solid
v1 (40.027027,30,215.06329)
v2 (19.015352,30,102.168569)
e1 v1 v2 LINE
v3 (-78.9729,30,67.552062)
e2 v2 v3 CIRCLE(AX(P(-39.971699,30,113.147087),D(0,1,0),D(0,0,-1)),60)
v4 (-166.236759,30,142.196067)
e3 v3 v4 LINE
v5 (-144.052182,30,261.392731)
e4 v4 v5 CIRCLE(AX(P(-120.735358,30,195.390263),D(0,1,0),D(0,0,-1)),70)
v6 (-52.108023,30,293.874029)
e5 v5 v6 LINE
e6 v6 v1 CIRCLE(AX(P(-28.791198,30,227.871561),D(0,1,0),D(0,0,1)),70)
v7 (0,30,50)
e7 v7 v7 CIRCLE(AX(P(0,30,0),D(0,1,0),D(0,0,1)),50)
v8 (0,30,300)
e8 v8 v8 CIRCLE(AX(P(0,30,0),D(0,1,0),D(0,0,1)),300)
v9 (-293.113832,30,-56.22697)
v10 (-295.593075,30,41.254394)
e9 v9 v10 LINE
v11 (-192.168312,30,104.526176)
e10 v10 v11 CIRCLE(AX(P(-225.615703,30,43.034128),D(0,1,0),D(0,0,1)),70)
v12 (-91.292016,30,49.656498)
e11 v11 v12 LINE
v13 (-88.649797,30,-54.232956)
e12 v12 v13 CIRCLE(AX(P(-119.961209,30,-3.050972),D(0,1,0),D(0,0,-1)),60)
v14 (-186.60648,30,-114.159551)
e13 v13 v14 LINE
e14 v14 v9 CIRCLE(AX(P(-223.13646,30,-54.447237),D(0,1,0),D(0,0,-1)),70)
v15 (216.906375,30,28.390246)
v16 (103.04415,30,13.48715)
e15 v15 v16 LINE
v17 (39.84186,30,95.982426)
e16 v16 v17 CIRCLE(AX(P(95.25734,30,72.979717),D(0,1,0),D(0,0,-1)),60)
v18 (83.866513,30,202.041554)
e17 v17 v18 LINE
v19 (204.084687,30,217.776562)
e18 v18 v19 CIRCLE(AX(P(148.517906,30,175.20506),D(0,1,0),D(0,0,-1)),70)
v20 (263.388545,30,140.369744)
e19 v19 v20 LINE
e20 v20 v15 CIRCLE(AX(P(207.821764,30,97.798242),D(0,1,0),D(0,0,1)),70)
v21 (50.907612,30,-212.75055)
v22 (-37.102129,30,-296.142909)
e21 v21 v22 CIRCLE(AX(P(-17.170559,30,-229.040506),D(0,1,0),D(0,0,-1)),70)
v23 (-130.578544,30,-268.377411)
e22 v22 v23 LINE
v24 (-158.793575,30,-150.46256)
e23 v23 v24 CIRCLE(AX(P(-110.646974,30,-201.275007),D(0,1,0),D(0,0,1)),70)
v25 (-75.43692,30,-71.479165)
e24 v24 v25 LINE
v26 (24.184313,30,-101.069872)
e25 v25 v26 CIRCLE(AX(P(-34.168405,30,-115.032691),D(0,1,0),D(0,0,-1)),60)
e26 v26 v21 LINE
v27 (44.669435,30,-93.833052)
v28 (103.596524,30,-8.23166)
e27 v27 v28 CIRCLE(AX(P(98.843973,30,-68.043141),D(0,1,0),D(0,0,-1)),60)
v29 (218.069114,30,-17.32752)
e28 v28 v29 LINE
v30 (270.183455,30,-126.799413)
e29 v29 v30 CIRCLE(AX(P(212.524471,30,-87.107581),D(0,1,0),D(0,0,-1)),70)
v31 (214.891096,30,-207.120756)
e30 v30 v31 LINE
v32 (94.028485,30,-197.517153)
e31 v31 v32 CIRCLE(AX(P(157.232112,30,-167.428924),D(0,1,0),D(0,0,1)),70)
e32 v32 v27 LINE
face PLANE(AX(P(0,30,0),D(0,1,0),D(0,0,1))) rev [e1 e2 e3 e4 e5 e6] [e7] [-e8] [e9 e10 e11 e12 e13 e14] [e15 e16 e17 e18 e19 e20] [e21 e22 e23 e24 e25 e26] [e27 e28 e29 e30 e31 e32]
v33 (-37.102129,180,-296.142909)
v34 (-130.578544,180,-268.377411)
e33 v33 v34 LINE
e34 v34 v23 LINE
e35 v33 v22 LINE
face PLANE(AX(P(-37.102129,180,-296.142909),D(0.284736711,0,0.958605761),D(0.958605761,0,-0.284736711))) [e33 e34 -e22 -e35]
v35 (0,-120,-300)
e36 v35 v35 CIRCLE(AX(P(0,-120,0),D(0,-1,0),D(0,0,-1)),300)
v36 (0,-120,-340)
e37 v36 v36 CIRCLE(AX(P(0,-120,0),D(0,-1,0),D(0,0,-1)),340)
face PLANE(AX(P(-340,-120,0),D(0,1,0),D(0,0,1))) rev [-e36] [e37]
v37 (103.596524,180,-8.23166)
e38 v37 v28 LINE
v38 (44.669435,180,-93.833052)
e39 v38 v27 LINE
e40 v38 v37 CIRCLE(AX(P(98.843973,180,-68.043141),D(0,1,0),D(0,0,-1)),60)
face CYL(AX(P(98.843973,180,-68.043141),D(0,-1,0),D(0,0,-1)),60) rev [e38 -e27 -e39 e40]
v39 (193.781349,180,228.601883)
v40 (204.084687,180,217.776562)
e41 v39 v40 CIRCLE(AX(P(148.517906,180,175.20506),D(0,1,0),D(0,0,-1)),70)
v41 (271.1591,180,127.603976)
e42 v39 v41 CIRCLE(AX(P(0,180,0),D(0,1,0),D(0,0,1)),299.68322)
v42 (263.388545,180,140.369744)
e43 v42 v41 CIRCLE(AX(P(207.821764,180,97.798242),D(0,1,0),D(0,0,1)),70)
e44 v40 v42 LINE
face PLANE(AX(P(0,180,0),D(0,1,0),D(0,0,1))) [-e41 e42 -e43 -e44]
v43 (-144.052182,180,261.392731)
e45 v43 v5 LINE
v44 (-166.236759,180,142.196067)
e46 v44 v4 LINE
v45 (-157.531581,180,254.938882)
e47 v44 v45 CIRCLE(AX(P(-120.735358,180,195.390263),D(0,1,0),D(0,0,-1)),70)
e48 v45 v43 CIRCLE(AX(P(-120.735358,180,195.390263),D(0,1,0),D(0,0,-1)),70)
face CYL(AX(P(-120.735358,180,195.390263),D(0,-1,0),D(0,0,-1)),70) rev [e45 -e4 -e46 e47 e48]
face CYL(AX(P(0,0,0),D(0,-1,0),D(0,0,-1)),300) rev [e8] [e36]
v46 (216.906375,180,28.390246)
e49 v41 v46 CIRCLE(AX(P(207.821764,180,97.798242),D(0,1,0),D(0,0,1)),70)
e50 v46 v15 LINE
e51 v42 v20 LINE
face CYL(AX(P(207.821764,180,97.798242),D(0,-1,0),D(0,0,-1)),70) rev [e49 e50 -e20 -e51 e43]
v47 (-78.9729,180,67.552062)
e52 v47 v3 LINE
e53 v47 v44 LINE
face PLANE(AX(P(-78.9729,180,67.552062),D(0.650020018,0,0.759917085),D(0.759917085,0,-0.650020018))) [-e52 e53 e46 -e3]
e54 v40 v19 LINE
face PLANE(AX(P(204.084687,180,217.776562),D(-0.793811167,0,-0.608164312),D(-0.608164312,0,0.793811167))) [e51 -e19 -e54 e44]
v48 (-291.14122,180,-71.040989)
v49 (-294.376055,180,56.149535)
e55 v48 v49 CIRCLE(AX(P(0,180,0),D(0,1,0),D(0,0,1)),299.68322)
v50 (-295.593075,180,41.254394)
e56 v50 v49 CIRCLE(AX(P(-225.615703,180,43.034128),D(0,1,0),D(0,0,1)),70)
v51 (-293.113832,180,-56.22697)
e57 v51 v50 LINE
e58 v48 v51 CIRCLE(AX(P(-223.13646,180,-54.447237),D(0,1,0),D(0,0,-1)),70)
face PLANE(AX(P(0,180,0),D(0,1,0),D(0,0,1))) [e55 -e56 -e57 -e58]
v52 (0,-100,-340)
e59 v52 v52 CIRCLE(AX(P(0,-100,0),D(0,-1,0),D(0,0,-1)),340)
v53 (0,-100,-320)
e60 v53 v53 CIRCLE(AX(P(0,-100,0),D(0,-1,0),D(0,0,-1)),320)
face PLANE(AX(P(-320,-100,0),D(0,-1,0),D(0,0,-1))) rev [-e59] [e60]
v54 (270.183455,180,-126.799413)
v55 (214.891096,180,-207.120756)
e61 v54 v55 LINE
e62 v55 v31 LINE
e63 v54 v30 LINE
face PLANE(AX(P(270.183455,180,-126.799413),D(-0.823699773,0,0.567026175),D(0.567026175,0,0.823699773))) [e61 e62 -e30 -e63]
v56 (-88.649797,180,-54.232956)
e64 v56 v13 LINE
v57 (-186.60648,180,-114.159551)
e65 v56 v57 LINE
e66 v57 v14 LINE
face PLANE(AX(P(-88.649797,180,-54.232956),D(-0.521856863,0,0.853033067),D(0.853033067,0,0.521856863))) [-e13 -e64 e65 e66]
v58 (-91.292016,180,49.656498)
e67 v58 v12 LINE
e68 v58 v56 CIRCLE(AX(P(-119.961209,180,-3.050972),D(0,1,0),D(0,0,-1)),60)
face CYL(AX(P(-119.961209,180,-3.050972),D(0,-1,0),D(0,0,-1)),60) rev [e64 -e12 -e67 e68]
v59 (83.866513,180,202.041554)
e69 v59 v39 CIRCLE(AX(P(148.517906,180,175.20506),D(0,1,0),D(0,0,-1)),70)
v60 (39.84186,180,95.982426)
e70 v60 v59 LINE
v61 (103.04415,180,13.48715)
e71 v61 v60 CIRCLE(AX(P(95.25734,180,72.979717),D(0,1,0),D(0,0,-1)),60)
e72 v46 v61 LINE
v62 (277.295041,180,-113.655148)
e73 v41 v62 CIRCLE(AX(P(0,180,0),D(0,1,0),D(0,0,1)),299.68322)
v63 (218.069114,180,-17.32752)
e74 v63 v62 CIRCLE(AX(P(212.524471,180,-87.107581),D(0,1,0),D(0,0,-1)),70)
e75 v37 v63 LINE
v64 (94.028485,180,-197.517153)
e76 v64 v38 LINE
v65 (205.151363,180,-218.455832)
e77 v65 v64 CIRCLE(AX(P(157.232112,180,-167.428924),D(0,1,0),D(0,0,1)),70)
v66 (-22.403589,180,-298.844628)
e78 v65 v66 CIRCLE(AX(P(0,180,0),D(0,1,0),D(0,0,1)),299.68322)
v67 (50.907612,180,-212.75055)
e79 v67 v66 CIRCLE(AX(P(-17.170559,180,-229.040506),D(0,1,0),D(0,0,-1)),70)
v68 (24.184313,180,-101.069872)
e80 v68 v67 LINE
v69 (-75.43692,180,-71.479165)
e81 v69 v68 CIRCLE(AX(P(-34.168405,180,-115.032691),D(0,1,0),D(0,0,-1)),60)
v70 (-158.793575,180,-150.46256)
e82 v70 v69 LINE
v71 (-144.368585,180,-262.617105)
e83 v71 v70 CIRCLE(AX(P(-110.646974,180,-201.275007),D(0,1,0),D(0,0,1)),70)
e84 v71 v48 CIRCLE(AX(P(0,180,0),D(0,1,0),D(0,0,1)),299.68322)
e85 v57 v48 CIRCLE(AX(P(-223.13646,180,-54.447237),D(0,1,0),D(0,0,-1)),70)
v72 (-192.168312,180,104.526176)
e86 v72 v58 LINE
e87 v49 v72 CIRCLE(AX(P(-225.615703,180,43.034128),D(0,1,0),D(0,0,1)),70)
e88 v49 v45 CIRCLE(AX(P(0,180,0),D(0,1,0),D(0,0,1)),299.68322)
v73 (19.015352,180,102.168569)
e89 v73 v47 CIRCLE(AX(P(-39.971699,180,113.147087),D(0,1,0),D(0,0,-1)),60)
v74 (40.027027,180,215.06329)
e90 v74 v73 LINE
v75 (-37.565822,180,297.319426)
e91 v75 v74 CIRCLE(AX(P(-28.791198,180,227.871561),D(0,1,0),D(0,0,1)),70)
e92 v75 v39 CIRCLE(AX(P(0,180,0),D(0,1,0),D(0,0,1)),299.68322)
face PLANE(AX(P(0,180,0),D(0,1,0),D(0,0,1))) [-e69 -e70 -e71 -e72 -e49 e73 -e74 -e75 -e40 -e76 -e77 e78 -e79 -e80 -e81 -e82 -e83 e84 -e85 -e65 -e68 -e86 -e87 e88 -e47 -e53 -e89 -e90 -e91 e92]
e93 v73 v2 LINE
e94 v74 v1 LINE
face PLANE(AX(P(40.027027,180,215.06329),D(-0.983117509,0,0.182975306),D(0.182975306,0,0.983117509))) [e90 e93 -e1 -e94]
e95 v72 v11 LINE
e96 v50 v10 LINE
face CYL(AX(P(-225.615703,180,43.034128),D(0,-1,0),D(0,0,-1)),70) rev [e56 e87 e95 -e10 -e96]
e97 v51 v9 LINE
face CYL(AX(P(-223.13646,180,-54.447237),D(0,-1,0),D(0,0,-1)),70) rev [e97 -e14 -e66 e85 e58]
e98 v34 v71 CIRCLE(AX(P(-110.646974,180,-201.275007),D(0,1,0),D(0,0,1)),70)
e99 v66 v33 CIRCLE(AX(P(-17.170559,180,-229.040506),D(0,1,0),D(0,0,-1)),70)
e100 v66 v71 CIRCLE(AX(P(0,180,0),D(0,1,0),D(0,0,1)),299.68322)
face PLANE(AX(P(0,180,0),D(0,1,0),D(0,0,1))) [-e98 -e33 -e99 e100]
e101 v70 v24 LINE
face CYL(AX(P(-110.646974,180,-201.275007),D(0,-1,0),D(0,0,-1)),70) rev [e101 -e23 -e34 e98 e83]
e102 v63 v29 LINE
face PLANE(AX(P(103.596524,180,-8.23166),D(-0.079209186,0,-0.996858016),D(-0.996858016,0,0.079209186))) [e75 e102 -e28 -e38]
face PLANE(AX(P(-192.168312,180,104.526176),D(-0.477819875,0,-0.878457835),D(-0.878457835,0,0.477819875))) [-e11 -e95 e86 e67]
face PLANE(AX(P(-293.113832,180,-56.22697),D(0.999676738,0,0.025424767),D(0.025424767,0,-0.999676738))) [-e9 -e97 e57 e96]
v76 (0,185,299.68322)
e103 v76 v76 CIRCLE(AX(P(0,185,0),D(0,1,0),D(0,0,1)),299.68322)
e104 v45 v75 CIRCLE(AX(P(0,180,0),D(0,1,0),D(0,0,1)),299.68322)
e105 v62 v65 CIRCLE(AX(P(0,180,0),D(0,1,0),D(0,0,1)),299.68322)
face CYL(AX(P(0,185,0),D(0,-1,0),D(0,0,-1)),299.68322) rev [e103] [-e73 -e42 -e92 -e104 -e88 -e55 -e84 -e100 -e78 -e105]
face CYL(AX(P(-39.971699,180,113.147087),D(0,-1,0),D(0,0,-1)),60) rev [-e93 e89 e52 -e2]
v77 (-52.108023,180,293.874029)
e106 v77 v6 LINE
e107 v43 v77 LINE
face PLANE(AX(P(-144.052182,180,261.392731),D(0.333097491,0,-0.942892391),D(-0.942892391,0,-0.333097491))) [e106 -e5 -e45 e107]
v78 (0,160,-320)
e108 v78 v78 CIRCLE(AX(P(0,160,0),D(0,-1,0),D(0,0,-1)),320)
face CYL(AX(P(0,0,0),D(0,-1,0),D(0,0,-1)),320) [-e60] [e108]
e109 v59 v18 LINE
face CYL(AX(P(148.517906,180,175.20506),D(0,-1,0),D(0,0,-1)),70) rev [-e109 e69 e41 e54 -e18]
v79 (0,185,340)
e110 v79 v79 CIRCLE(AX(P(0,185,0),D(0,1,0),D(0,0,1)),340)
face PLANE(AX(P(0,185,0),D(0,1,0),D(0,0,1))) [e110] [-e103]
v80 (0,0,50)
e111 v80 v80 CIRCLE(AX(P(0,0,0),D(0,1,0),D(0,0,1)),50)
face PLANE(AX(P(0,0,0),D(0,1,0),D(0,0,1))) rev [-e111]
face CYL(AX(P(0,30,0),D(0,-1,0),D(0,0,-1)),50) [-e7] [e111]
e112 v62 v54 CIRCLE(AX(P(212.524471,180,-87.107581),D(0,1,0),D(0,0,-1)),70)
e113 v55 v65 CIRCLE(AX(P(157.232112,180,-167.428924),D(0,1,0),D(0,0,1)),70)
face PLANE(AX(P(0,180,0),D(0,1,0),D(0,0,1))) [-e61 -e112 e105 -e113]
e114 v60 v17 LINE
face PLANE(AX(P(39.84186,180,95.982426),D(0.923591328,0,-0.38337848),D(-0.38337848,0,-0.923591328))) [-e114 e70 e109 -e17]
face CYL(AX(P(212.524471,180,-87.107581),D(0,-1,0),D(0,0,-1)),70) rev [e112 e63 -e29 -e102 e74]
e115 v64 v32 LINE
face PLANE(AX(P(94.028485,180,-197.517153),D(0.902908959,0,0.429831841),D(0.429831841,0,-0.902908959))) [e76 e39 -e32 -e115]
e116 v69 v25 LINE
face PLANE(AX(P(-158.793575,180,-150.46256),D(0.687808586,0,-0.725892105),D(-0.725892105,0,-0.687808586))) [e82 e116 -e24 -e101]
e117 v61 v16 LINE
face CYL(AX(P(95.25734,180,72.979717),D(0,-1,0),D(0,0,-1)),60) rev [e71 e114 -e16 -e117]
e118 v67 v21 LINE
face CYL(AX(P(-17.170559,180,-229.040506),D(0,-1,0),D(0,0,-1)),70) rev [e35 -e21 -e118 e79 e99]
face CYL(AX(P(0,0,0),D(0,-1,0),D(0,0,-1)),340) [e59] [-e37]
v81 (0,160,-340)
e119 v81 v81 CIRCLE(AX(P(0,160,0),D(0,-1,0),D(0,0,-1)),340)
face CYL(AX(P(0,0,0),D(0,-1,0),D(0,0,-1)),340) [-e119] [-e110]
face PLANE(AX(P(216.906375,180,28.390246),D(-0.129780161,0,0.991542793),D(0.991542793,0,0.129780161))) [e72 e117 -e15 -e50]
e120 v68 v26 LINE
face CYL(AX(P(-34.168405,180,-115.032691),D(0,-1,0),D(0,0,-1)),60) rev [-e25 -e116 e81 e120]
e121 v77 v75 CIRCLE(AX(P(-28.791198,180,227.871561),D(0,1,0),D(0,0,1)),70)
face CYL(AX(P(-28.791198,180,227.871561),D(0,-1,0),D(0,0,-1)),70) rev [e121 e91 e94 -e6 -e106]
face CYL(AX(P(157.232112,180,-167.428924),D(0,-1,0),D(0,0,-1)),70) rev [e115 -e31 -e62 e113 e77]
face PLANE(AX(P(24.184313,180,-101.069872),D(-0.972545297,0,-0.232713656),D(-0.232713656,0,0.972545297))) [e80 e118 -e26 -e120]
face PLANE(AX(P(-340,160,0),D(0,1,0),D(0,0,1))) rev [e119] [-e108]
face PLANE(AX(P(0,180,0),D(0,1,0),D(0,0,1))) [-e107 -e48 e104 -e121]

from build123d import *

# Parameters (mm, degrees)
SKETCH2_R               = 50
BOSS_EXTRUDE1_DEPTH     = 30
BOSS_EXTRUDE2_OUTLINE_R = 300
BOSS_EXTRUDE2_DEPTH     = 150
SKETCH5_R               = 340
SKETCH5_R_2             = 299.683220022
BOSS_EXTRUDE3_DEPTH     = 5


# Read off the part's stored shape, not the designer's step: Boss-Extrude2
with BuildPart() as part:
    # Sketch2 → Boss-Extrude1 (new body)
    with BuildSketch(Plane(origin=(0, 0, 0), x_dir=(1, 0, 0), z_dir=(0, 1, 0))):
        with Locations(Location((0, 0, 0), (0, 0, 270))):
            Circle(SKETCH2_R)
    extrude(amount=BOSS_EXTRUDE1_DEPTH)



with BuildPart() as body_2:
    # Sketch3 → Revolve1 (revolve)
    with BuildSketch(Plane.XY, mode=Mode.PRIVATE) as revolve1_sk:
        Polygon((-300, 30), (-300, 180), (-340, 180), (-340, 160), (-320, 160), (-320, -100), (-340, -100), (-340, -120), (-300, -120), align=None)
    revolve(revolve1_sk.sketch.rotate(Axis((0, 0, 0), (0, 1, 0)), 270), axis=Axis((0, 0, 0), (0, 1, 0)))


with BuildPart() as part_1:
    add(part.part)

    add(body_2.part)  # Boss-Extrude2 merges body 2
    # Boss-Extrude2 outline → Boss-Extrude2 (add)
    with BuildSketch(Plane(origin=(0, 30, 0), x_dir=(1, 0, 0), z_dir=(0, 1, 0))):
        Circle(BOSS_EXTRUDE2_OUTLINE_R)
        with BuildLine():
            Line((19.015351597, -102.16856857), (40.027027196, -215.063289879))
            ThreePointArc((40.027027196, -215.063289879), (16.710202797, -281.065757257), (-52.108022864, -293.874028681))
            Line((-52.108022864, -293.874028681), (-144.052181995, -261.392730661))
            ThreePointArc((-144.052181995, -261.392730661), (-189.553583257, -208.198534707), (-166.236758859, -142.196067329))
            Line((-166.236758859, -142.196067329), (-78.972900051, -67.55206183))
            ThreePointArc((-78.972900051, -67.55206183), (-19.985849485, -56.573543467), (19.015351597, -102.16856857))
        make_face(mode=Mode.SUBTRACT)
        with BuildLine():
            Line((103.044149697, -13.487149933), (216.906374893, -28.390246396))
            ThreePointArc((216.906374893, -28.390246396), (272.47315659, -70.96174827), (263.388545339, -140.369743763))
            Line((263.388545339, -140.369743763), (204.084687494, -217.776562353))
            ThreePointArc((204.084687494, -217.776562353), (139.433294545, -244.613055972), (83.866512848, -202.041554098))
            Line((83.866512848, -202.041554098), (39.841860382, -95.982426315))
            ThreePointArc((39.841860382, -95.982426315), (47.628670026, -36.489858749), (103.044149697, -13.487149933))
        make_face(mode=Mode.SUBTRACT)
        with BuildLine():
            Line((-91.292016101, -49.656498025), (-192.168311617, -104.526176482))
            ThreePointArc((-192.168311617, -104.526176482), (-262.145683303, -102.746442788), (-295.593074555, -41.254394372))
            Line((-295.593074555, -41.254394372), (-293.11383212, 56.226970393))
            ThreePointArc((-293.11383212, 56.226970393), (-256.583851687, 115.939285115), (-186.606480002, 114.159551422))
            Line((-186.606480002, 114.159551422), (-88.649796804, 54.232956094))
            ThreePointArc((-88.649796804, 54.232956094), (-59.980604302, 1.525486023), (-91.292016101, -49.656498025))
        make_face(mode=Mode.SUBTRACT)
        with BuildLine():
            Line((-75.43692045, 71.479165028), (-158.793575336, 150.462560099))
            ThreePointArc((-158.793575336, 150.462560099), (-178.725145082, 217.56496339), (-130.57854405, 268.377410774))
            Line((-130.57854405, 268.377410774), (-37.102128828, 296.142909448))
            ThreePointArc((-37.102128828, 296.142909448), (30.97604195, 279.85295354), (50.907611696, 212.750550249))
            Line((50.907611696, 212.750550249), (24.184312531, 101.069872007))
            ThreePointArc((24.184312531, 101.069872007), (-17.08420264, 57.516345678), (-75.43692045, 71.479165028))
        make_face(mode=Mode.SUBTRACT)
        with BuildLine():
            Line((44.669435257, 93.8330515), (94.028484864, 197.517152657))
            ThreePointArc((94.028484864, 197.517152657), (151.687468997, 237.208984925), (214.89109613, 207.120756043))
            Line((214.89109613, 207.120756043), (270.18345545, 126.799413173))
            ThreePointArc((270.18345545, 126.799413173), (275.72809845, 57.019352024), (218.069114317, 17.327519757))
            Line((218.069114317, 17.327519757), (103.596523942, 8.231660045))
            ThreePointArc((103.596523942, 8.231660045), (49.4219864, 34.021570515), (44.669435257, 93.8330515))
        make_face(mode=Mode.SUBTRACT)
    extrude(amount=BOSS_EXTRUDE2_DEPTH)

    # Sketch5 → Boss-Extrude3 (add)
    with BuildSketch(Plane(origin=(0, 180, 0), x_dir=(1, 0, 0), z_dir=(0, 1, 0))):
        with Locations(Location((0, 0, 0), (0, 0, 90))):
            Circle(SKETCH5_R)
        with Locations(Location((0, 0, 0), (0, 0, 94.287292905))):
            Circle(SKETCH5_R_2, mode=Mode.SUBTRACT)
    extrude(amount=BOSS_EXTRUDE3_DEPTH)


solid = part_1.part
